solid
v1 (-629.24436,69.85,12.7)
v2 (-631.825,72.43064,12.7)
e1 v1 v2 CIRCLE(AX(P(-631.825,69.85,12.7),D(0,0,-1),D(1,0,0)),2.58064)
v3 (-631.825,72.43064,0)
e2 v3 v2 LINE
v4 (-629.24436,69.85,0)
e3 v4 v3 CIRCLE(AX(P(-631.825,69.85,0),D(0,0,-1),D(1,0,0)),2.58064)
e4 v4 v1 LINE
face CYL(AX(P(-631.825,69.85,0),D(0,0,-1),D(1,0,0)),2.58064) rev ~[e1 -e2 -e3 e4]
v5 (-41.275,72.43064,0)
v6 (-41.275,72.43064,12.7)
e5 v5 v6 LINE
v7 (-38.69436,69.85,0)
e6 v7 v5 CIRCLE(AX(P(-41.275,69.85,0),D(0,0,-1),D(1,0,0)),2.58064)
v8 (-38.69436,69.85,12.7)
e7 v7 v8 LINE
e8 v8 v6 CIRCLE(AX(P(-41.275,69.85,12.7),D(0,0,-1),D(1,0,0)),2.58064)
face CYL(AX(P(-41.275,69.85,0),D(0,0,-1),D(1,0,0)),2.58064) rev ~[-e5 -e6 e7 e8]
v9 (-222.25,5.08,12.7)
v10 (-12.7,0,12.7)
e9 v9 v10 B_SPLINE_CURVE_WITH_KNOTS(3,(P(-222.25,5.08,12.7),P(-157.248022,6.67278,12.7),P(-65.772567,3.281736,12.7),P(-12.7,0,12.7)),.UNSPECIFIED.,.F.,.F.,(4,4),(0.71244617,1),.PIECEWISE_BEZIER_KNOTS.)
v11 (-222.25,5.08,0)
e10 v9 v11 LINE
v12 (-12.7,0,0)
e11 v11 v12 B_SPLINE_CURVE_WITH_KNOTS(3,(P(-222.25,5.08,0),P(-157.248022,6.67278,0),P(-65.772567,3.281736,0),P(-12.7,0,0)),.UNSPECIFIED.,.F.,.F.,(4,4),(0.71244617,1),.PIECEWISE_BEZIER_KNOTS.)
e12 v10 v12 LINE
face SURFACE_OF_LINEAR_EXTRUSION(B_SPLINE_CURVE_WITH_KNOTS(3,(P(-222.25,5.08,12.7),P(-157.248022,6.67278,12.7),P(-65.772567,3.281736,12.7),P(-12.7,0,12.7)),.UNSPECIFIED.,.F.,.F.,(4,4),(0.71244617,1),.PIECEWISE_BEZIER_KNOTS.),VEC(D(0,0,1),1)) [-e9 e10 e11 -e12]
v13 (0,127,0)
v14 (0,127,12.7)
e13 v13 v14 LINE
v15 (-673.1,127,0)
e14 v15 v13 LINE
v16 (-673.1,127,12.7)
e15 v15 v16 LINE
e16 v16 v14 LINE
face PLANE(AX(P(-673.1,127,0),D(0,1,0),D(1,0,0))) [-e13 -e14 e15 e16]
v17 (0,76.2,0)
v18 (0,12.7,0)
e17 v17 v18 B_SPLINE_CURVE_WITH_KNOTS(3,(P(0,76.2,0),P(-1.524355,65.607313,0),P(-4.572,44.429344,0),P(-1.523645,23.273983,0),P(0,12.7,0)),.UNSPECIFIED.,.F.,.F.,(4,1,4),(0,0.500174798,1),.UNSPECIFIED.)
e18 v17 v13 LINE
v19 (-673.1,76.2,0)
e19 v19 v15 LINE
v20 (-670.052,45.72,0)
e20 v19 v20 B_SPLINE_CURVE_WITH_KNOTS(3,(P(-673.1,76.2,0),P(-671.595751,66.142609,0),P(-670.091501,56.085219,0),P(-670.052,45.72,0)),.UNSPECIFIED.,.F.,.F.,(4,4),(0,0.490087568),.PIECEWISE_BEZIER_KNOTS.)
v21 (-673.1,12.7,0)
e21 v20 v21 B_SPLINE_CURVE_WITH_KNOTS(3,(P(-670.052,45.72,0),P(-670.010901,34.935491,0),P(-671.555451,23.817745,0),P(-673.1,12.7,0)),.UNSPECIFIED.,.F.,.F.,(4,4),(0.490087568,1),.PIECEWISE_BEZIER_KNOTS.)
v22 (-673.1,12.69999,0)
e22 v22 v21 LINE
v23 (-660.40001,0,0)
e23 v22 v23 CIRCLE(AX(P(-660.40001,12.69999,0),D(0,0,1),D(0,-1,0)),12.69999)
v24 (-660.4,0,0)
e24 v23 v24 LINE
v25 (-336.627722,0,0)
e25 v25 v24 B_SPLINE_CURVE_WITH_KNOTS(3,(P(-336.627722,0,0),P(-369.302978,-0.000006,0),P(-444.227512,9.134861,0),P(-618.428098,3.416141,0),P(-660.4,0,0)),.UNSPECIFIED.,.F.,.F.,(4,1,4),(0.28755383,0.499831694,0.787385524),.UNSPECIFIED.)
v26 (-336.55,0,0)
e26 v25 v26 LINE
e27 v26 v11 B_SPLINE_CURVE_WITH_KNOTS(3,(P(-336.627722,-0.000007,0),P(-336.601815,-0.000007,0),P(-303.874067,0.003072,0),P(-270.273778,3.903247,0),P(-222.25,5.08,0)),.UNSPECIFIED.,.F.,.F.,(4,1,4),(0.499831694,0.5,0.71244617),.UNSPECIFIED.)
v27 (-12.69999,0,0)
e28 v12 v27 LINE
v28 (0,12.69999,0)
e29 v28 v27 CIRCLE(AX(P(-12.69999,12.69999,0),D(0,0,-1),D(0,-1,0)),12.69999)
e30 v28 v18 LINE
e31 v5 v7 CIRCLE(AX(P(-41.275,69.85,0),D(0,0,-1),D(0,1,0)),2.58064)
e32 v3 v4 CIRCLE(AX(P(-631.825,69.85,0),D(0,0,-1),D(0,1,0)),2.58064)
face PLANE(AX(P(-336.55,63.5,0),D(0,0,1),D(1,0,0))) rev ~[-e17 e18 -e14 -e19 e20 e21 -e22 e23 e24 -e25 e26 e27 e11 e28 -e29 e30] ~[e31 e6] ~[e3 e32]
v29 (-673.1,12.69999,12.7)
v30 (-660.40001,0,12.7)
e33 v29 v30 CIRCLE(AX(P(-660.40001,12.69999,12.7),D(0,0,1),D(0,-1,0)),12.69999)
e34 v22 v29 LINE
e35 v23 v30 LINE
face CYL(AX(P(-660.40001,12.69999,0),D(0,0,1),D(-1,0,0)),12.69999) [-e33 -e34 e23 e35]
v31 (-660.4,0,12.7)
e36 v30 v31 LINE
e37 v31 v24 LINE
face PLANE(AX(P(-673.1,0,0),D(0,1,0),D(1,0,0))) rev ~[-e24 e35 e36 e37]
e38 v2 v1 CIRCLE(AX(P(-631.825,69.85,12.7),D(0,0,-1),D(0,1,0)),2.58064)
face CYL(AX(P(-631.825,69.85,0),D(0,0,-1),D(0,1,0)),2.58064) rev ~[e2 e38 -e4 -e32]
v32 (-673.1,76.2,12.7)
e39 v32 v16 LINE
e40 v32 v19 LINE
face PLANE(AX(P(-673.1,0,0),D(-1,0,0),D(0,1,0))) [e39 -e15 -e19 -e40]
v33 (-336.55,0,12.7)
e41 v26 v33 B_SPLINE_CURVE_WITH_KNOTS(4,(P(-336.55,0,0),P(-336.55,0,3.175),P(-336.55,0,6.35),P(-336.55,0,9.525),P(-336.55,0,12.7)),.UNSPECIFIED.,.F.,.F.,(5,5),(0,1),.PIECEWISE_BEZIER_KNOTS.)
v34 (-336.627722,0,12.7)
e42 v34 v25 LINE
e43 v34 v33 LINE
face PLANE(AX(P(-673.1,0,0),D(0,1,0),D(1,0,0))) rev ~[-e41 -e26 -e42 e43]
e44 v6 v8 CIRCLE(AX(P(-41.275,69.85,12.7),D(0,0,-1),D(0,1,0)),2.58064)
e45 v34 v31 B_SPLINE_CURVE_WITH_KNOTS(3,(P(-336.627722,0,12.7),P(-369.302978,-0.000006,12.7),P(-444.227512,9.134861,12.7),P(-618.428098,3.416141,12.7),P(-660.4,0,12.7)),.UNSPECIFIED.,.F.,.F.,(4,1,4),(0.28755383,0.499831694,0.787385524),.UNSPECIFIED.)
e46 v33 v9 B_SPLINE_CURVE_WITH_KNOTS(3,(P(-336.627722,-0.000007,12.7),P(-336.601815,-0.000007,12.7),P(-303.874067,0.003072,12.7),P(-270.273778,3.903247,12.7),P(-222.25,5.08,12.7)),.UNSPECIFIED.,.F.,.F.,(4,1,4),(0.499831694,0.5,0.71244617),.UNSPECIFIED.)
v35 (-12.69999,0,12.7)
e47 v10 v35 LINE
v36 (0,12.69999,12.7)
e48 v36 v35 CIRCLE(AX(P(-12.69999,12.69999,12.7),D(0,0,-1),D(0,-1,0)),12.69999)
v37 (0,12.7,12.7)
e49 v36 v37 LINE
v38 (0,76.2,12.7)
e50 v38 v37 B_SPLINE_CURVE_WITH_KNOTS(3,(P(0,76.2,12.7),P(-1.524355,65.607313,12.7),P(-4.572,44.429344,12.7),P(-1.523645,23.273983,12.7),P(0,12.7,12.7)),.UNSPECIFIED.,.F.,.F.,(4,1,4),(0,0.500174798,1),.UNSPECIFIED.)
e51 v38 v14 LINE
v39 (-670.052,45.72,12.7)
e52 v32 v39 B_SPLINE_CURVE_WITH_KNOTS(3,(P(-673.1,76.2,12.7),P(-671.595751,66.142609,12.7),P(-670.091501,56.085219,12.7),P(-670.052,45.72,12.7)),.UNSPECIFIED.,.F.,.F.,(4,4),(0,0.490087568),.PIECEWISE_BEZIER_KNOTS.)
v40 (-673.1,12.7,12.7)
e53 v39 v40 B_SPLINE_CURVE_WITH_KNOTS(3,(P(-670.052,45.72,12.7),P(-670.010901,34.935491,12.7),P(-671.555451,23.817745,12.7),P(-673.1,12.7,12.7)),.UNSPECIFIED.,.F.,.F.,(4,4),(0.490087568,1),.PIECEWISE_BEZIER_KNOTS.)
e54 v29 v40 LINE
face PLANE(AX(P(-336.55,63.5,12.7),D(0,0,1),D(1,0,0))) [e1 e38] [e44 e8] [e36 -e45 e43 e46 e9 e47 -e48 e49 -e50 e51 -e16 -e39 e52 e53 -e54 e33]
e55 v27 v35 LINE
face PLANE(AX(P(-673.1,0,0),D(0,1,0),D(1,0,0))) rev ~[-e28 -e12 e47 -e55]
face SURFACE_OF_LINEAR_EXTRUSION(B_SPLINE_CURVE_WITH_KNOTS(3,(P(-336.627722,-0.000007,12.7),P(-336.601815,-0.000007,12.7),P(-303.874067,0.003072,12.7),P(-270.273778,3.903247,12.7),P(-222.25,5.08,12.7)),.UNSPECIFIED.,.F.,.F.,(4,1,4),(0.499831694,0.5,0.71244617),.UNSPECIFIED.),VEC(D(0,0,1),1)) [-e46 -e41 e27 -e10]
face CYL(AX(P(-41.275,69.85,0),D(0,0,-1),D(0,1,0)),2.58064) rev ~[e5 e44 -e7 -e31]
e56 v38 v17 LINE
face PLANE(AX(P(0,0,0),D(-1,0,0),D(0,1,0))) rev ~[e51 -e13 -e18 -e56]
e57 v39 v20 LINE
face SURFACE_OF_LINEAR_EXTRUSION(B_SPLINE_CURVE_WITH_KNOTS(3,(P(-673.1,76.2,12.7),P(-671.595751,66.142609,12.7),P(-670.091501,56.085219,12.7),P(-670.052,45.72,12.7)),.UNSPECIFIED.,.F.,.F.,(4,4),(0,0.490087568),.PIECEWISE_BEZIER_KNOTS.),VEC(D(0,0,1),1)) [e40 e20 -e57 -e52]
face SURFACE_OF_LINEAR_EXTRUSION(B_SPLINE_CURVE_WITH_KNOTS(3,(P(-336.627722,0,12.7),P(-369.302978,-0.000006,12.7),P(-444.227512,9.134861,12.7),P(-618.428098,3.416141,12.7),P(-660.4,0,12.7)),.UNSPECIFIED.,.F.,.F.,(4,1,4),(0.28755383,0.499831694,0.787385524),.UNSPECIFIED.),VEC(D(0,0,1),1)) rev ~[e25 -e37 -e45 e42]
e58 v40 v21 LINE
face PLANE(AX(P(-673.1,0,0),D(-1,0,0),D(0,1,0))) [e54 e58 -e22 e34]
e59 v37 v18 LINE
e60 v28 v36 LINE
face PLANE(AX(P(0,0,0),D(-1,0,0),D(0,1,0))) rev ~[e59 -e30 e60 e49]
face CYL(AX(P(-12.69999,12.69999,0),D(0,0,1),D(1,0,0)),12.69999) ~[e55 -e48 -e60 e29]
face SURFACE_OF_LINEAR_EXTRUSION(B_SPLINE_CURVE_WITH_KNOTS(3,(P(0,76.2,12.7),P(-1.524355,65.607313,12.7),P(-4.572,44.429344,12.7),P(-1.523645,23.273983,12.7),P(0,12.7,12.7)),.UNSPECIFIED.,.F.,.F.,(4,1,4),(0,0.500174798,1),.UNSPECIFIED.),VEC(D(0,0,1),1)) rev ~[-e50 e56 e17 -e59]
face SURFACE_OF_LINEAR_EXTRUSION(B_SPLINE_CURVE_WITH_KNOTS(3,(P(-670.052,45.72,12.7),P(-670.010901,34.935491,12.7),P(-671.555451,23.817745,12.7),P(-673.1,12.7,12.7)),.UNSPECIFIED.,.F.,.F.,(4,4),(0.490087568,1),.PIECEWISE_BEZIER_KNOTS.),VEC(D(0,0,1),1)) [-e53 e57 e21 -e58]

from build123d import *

# Parameters (mm, degrees)
F0_W     = 673.1
F0_H     = 127
F1_DEPTH = 12.7
F3_DEPTH = 12.7
F4_R     = 12.69999
F6_DEPTH = 12.7


# Not quite as in the source:
# - a fillet or chamfer is up to 0.001 mm smaller than in the source, because OpenCascade refuses the exact size
# - ends of sketch curves that miss each other by under 0.0002 mm in the source are joined


with BuildPart() as f1:
    # F0 (on Top) → F1 (new body)
    with BuildSketch(Plane.XY):
        with Locations((-336.55, 63.5)):
            Rectangle(F0_W, F0_H)
    extrude(amount=F1_DEPTH)

    # F2 (on face) → F3 (cut)
    with BuildSketch(Plane.XY.offset(12.7)):
        with BuildLine():
            Line((-660.4, 0), (-450.85, 0))
            Line((-450.85, 0), (-450.85, 5.08))
            add(Edge.make_bspline(
                [(-660.4, 0), (-618.4280983715, 3.4161410723), (-518.2102721788, 6.7061283939), (-450.85, 5.08)],
                knots=[0, 0, 0, 0, 0.2875538304, 0.2875538304, 0.2875538304, 0.2875538304], degree=3))
        make_face()
        with BuildLine():
            Line((-450.85, 5.08), (-450.85, 0))
            Line((-450.85, 0), (-336.6277222604, 0))
            add(Edge.make_bspline(
                [(-450.85, 5.08), (-401.1233292925, 3.8795602073), (-369.3029781403, -5.9421e-06), (-336.6277222604, 0)],
                knots=[0.2875538304, 0.2875538304, 0.2875538304, 0.2875538304, 0.4998316935, 0.4998316935, 0.4998316935, 0.4998316935], degree=3))
        make_face()
        with BuildLine():
            add(Edge.make_bspline(
                [(-336.6277222604, -7.3164e-06), (-336.6018153808, -7.3175e-06), (-303.8740668477, 0.0030721325), (-270.2737779375, 3.9032465323), (-222.25, 5.08)],
                knots=[0.4998316935, 0.4998316935, 0.4998316935, 0.4998316935, 0.5, 0.7124461696, 0.7124461696, 0.7124461696, 0.7124461696], degree=3))
            Line((-336.6277222604, -7.3164e-06), (-222.25, 0))
            Line((-222.25, 0), (-222.25, 5.08))
        make_face()
        with BuildLine():
            add(Edge.make_bspline(
                [(-222.25, 5.08), (-157.2480217343, 6.6727797981), (-65.7725673543, 3.2817360247), (-12.7, 0)],
                knots=[0.7124461696, 0.7124461696, 0.7124461696, 0.7124461696, 1, 1, 1, 1], degree=3))
            Line((-222.25, 5.08), (-222.25, 0))
            Line((-222.25, 0), (-12.7, 0))
        make_face()
        with BuildLine():
            add(Edge.make_bspline(
                [(0, 76.2), (-1.5243553143, 65.6073133136), (-3.0487106286, 55.0146266272), (-3.048, 44.4275960326)],
                knots=[0, 0, 0, 0, 0.5001747983, 0.5001747983, 0.5001747983, 0.5001747983], degree=3))
            Line((-3.048, 44.4275960326), (0, 44.4275960326))
            Line((0, 44.4275960326), (0, 76.2))
        make_face()
        with BuildLine():
            add(Edge.make_bspline(
                [(-3.048, 44.4275960326), (-3.0472898681, 33.8479652297), (-1.523644934, 23.2739826149), (0, 12.7)],
                knots=[0.5001747983, 0.5001747983, 0.5001747983, 0.5001747983, 1, 1, 1, 1], degree=3))
            Line((0, 12.7), (0, 44.4275960326))
            Line((0, 44.4275960326), (-3.048, 44.4275960326))
        make_face()
        with BuildLine():
            Line((-673.1, 45.72), (-670.052, 45.72))
            add(Edge.make_bspline(
                [(-673.1, 76.2), (-671.5957505111, 66.1426093711), (-670.0915010221, 56.0852187422), (-670.052, 45.72)],
                knots=[0, 0, 0, 0, 0.4900875678, 0.4900875678, 0.4900875678, 0.4900875678], degree=3))
            Line((-673.1, 76.2), (-673.1, 45.72))
        make_face()
        with BuildLine():
            Line((-673.1, 45.72), (-673.1, 12.7))
            add(Edge.make_bspline(
                [(-670.052, 45.72), (-670.0109010952, 34.9354907678), (-671.5554505476, 23.8177453839), (-673.1, 12.7)],
                knots=[0.4900875678, 0.4900875678, 0.4900875678, 0.4900875678, 1, 1, 1, 1], degree=3))
            Line((-670.052, 45.72), (-673.1, 45.72))
        make_face()
    extrude(amount=-F3_DEPTH, mode=Mode.SUBTRACT)

    # F4 (radius 12.7 in the source; OpenCascade refuses exactly that, so slightly less here)
    f4_edges = [f1.edges().sort_by_distance(p)[0] for p in [
        (-673.1, 0, 6.35),
        (0, 0, 6.35),
    ]]
    fillet(f4_edges, radius=F4_R)

    # F5 (on face) → F6 (cut)
    with BuildSketch(Plane(origin=(0, 0, 0), x_dir=(1, 0, 0), z_dir=(0, 0, -1))):
        with BuildLine():
            ThreePointArc((-38.69436, -69.85), (-43.0997880438, -68.0252119562), (-41.275, -72.43064))
            ThreePointArc((-41.275, -72.43064), (-39.4502119562, -71.6747880438), (-38.69436, -69.85))
        make_face()
        with BuildLine():
            ThreePointArc((-629.24436, -69.85), (-633.6497880438, -68.0252119562), (-631.825, -72.43064))
            ThreePointArc((-631.825, -72.43064), (-630.0002119562, -71.6747880438), (-629.24436, -69.85))
        make_face()
    extrude(amount=-F6_DEPTH, mode=Mode.SUBTRACT)


solid = f1.part
